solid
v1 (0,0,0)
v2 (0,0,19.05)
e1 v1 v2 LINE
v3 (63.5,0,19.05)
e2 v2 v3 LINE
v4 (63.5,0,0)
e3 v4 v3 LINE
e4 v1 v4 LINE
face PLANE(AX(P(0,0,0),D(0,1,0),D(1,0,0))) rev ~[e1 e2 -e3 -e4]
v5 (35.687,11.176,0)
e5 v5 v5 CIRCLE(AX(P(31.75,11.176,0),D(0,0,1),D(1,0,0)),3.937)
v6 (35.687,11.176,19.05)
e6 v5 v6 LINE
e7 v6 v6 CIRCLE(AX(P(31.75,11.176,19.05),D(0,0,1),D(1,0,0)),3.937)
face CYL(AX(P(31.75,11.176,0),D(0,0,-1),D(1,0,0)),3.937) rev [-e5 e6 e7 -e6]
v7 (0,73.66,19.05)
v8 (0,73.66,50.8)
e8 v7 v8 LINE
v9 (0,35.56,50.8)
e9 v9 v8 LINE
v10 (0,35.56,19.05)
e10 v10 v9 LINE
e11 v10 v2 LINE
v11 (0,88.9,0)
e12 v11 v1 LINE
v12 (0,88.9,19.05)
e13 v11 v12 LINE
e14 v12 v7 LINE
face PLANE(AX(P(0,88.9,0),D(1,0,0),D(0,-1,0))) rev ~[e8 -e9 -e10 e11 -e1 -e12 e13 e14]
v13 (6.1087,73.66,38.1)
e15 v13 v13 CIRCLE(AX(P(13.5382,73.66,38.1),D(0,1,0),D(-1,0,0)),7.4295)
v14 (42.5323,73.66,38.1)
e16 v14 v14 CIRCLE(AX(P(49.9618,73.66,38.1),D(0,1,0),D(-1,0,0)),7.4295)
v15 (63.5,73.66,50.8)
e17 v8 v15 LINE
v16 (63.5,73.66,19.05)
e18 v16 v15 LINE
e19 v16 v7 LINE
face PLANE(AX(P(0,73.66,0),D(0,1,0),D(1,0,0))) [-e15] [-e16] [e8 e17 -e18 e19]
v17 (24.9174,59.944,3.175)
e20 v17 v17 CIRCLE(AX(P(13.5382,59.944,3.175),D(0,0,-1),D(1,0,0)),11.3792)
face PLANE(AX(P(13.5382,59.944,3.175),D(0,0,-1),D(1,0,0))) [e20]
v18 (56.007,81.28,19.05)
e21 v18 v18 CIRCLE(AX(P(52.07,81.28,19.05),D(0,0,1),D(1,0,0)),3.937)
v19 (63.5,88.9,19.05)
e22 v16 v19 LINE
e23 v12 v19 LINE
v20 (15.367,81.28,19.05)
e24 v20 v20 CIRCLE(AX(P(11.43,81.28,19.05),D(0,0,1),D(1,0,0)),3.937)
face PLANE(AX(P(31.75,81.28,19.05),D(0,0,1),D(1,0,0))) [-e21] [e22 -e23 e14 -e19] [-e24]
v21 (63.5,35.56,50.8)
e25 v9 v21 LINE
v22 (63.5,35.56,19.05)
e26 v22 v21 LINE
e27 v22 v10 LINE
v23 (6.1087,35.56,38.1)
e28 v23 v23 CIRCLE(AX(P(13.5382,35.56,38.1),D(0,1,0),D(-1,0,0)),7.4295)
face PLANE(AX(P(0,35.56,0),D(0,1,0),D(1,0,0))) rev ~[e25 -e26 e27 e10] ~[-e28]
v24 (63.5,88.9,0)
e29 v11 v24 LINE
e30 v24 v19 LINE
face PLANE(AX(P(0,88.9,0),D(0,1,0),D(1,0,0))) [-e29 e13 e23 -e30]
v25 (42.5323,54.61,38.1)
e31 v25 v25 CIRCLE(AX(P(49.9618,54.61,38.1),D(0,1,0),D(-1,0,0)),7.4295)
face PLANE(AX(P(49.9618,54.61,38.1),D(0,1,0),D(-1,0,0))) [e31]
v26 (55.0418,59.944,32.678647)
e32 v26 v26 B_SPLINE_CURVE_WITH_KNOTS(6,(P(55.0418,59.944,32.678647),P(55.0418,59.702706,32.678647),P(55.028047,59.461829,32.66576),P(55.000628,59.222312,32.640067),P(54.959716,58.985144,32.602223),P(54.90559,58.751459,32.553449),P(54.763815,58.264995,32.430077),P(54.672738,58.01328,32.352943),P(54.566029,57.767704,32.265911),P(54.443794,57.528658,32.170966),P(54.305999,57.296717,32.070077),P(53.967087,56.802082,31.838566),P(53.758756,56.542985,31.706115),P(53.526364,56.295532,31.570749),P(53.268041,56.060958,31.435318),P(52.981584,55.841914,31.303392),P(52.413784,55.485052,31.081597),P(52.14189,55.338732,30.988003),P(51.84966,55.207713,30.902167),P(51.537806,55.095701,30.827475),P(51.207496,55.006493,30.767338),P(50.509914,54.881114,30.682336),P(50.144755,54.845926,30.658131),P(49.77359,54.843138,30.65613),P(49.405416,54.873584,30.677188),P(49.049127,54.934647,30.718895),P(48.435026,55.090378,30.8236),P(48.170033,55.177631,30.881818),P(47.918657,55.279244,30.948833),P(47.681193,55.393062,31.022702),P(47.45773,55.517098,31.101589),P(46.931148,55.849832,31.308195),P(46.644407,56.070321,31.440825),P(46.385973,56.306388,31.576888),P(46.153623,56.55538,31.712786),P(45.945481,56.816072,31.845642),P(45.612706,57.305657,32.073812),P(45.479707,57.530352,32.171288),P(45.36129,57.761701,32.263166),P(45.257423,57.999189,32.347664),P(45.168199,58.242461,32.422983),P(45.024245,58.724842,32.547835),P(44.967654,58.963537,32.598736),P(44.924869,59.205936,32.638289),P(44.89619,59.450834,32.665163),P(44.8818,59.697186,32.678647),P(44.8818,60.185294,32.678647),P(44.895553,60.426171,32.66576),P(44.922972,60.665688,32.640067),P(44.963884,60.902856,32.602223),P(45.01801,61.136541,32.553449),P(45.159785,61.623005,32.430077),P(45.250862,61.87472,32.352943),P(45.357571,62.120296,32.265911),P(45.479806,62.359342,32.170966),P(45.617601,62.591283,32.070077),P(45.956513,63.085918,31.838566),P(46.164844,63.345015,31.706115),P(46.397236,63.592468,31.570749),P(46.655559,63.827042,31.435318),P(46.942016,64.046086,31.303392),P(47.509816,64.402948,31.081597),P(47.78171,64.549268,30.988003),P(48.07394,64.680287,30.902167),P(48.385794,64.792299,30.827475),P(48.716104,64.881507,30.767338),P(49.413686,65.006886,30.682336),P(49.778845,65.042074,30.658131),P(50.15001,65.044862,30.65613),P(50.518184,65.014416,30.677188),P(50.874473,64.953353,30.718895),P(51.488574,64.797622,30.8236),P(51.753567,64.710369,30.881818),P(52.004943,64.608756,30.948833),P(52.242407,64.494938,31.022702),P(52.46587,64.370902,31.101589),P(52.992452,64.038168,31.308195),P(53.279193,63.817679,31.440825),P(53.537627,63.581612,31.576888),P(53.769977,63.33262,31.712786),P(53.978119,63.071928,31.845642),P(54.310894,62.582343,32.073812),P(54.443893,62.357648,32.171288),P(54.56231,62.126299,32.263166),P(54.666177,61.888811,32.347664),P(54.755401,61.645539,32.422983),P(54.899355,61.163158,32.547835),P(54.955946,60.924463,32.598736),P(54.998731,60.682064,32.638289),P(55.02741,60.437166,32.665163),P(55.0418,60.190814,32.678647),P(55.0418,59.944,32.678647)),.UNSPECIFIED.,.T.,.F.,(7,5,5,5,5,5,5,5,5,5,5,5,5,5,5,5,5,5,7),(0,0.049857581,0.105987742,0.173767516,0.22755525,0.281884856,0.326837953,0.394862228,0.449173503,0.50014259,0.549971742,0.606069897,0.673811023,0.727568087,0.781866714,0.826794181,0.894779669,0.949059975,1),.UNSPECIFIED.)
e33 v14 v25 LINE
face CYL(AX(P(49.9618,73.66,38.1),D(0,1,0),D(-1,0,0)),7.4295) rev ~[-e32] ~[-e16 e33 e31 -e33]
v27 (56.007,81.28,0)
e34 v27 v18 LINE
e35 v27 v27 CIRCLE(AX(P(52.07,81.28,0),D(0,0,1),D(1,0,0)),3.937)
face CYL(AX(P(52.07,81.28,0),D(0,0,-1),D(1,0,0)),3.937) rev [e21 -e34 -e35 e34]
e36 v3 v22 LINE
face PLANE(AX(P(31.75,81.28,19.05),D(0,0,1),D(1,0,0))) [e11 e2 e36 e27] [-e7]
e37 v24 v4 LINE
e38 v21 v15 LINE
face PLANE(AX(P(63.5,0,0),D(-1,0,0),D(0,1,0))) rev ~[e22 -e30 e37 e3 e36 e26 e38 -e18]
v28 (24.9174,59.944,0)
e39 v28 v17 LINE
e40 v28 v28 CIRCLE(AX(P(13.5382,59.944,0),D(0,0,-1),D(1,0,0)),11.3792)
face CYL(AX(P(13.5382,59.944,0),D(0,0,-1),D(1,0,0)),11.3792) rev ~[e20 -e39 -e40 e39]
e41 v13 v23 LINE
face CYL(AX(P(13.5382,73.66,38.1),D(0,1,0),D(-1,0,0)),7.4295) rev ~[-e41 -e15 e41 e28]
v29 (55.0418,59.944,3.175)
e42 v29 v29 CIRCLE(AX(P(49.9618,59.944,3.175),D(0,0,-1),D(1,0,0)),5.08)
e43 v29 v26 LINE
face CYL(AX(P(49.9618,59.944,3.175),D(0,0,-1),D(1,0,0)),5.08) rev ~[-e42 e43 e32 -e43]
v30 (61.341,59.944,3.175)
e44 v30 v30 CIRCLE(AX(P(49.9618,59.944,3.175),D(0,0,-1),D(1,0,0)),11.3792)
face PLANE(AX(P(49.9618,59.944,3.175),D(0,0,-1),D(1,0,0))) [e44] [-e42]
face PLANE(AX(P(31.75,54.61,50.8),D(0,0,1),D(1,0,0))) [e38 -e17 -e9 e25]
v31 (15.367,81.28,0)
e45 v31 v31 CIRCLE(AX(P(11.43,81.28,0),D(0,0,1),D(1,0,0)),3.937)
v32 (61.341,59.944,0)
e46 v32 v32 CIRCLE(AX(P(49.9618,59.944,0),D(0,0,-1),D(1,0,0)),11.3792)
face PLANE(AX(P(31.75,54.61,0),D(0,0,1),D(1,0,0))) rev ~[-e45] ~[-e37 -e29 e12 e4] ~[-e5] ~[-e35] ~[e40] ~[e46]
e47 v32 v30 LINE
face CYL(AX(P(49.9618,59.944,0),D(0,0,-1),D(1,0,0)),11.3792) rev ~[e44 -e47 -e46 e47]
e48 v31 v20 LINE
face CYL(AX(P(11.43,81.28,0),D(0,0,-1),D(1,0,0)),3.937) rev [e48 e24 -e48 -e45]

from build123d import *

# Parameters (mm, degrees)
F0_W      = 63.5
F0_H      = 15.24
F0_R      = 3.937
F0_H_2    = 38.1
F0_R_2    = 7.4295
F0_H_3    = 35.56
F1_DEPTH  = 19.05
F5_DEPTH  = 50.8
F7_DEPTH  = 3.175
F2_R      = 11.3792
F9_DEPTH  = 3.175
F6_R      = 7.4295
F10_DEPTH = 19.05
F11_DEPTH = 73.661
F8_R      = 5.08
F12_DEPTH = 31.75


# Not quite as in the source:
# - a feature names something its author has since deleted; it is built from what else it names


with BuildPart() as f1:
    # F0 (on Top) → F1 (new body)
    with BuildSketch(Plane.XY):
        with Locations((31.75, 81.28)):
            Rectangle(F0_W, F0_H)
        with Locations((11.43, 81.28)):
            Circle(F0_R, mode=Mode.SUBTRACT)
        with Locations((52.07, 81.28)):
            Circle(F0_R, mode=Mode.SUBTRACT)
        with Locations((31.75, 54.61)):
            Rectangle(F0_W, F0_H_2)
        with Locations((13.5382, 59.944)):
            Circle(F0_R_2, mode=Mode.SUBTRACT)
        with Locations((49.9618, 59.944)):
            Circle(F0_R_2, mode=Mode.SUBTRACT)
        with Locations((13.5382, 59.944)):
            Circle(F0_R_2)
        with Locations((49.9618, 59.944)):
            Circle(F0_R_2)
        with Locations((31.75, 17.78)):
            Rectangle(F0_W, F0_H_3)
        with Locations((31.75, 11.176)):
            Circle(F0_R, mode=Mode.SUBTRACT)
    extrude(amount=F1_DEPTH)


with BuildPart() as f3_1:
    # F3: copy of F1
    add(f1.part.moved(Location((-152.4, 0, 0))))


with BuildPart() as f1_1:
    add(f1.part)

    # F0 (on Top) → F5 (join)
    with BuildSketch(Plane.XY):
        with Locations((31.75, 54.61)):
            Rectangle(F0_W, F0_H_2)
        with Locations((13.5382, 59.944)):
            Circle(F0_R_2, mode=Mode.SUBTRACT)
        with Locations((49.9618, 59.944)):
            Circle(F0_R_2, mode=Mode.SUBTRACT)
        with Locations((49.9618, 59.944)):
            Circle(F0_R_2)
        with Locations((13.5382, 59.944)):
            Circle(F0_R_2)
    extrude(amount=F5_DEPTH)

    # F0 (on Top) → F7 (cut)
    with BuildSketch(Plane.XY):
        with Locations((49.9618, 59.944)):
            Circle(F0_R_2)
        with Locations((13.5382, 59.944)):
            Circle(F0_R_2)
    extrude(amount=F7_DEPTH, mode=Mode.SUBTRACT)

    # F2 (on face) → F9 (cut)
    with BuildSketch(Plane(origin=(0, 0, 0), x_dir=(1, 0, 0), z_dir=(0, 0, -1))):
        with Locations((49.9618, -59.944)):
            Circle(F2_R)
        with Locations((13.5382, -59.944)):
            Circle(F2_R)
    extrude(amount=-F9_DEPTH, mode=Mode.SUBTRACT)

    # F6 (on face) → F10 (cut)
    with BuildSketch(Plane(origin=(0, 73.66, 0), x_dir=(-1, 0, 0), z_dir=(0, 1, 0))):
        with Locations((-49.9618, 38.1)):
            Circle(F6_R)
    extrude(amount=-F10_DEPTH, mode=Mode.SUBTRACT)

    # F6 (on face) → F11 (cut, through all)
    with BuildSketch(Plane(origin=(0, 73.66, 0), x_dir=(-1, 0, 0), z_dir=(0, 1, 0))):
        with Locations((-13.5382, 38.1)):
            Circle(F6_R)
    extrude(amount=-F11_DEPTH, mode=Mode.SUBTRACT)

    # F8 (on face) → F12 (cut)
    with BuildSketch(Plane(origin=(0, 0, 3.175), x_dir=(1, 0, 0), z_dir=(0, 0, -1))):
        with Locations((49.9618, -59.944)):
            Circle(F8_R)
    extrude(amount=-F12_DEPTH, mode=Mode.SUBTRACT)


solid = f1_1.part
